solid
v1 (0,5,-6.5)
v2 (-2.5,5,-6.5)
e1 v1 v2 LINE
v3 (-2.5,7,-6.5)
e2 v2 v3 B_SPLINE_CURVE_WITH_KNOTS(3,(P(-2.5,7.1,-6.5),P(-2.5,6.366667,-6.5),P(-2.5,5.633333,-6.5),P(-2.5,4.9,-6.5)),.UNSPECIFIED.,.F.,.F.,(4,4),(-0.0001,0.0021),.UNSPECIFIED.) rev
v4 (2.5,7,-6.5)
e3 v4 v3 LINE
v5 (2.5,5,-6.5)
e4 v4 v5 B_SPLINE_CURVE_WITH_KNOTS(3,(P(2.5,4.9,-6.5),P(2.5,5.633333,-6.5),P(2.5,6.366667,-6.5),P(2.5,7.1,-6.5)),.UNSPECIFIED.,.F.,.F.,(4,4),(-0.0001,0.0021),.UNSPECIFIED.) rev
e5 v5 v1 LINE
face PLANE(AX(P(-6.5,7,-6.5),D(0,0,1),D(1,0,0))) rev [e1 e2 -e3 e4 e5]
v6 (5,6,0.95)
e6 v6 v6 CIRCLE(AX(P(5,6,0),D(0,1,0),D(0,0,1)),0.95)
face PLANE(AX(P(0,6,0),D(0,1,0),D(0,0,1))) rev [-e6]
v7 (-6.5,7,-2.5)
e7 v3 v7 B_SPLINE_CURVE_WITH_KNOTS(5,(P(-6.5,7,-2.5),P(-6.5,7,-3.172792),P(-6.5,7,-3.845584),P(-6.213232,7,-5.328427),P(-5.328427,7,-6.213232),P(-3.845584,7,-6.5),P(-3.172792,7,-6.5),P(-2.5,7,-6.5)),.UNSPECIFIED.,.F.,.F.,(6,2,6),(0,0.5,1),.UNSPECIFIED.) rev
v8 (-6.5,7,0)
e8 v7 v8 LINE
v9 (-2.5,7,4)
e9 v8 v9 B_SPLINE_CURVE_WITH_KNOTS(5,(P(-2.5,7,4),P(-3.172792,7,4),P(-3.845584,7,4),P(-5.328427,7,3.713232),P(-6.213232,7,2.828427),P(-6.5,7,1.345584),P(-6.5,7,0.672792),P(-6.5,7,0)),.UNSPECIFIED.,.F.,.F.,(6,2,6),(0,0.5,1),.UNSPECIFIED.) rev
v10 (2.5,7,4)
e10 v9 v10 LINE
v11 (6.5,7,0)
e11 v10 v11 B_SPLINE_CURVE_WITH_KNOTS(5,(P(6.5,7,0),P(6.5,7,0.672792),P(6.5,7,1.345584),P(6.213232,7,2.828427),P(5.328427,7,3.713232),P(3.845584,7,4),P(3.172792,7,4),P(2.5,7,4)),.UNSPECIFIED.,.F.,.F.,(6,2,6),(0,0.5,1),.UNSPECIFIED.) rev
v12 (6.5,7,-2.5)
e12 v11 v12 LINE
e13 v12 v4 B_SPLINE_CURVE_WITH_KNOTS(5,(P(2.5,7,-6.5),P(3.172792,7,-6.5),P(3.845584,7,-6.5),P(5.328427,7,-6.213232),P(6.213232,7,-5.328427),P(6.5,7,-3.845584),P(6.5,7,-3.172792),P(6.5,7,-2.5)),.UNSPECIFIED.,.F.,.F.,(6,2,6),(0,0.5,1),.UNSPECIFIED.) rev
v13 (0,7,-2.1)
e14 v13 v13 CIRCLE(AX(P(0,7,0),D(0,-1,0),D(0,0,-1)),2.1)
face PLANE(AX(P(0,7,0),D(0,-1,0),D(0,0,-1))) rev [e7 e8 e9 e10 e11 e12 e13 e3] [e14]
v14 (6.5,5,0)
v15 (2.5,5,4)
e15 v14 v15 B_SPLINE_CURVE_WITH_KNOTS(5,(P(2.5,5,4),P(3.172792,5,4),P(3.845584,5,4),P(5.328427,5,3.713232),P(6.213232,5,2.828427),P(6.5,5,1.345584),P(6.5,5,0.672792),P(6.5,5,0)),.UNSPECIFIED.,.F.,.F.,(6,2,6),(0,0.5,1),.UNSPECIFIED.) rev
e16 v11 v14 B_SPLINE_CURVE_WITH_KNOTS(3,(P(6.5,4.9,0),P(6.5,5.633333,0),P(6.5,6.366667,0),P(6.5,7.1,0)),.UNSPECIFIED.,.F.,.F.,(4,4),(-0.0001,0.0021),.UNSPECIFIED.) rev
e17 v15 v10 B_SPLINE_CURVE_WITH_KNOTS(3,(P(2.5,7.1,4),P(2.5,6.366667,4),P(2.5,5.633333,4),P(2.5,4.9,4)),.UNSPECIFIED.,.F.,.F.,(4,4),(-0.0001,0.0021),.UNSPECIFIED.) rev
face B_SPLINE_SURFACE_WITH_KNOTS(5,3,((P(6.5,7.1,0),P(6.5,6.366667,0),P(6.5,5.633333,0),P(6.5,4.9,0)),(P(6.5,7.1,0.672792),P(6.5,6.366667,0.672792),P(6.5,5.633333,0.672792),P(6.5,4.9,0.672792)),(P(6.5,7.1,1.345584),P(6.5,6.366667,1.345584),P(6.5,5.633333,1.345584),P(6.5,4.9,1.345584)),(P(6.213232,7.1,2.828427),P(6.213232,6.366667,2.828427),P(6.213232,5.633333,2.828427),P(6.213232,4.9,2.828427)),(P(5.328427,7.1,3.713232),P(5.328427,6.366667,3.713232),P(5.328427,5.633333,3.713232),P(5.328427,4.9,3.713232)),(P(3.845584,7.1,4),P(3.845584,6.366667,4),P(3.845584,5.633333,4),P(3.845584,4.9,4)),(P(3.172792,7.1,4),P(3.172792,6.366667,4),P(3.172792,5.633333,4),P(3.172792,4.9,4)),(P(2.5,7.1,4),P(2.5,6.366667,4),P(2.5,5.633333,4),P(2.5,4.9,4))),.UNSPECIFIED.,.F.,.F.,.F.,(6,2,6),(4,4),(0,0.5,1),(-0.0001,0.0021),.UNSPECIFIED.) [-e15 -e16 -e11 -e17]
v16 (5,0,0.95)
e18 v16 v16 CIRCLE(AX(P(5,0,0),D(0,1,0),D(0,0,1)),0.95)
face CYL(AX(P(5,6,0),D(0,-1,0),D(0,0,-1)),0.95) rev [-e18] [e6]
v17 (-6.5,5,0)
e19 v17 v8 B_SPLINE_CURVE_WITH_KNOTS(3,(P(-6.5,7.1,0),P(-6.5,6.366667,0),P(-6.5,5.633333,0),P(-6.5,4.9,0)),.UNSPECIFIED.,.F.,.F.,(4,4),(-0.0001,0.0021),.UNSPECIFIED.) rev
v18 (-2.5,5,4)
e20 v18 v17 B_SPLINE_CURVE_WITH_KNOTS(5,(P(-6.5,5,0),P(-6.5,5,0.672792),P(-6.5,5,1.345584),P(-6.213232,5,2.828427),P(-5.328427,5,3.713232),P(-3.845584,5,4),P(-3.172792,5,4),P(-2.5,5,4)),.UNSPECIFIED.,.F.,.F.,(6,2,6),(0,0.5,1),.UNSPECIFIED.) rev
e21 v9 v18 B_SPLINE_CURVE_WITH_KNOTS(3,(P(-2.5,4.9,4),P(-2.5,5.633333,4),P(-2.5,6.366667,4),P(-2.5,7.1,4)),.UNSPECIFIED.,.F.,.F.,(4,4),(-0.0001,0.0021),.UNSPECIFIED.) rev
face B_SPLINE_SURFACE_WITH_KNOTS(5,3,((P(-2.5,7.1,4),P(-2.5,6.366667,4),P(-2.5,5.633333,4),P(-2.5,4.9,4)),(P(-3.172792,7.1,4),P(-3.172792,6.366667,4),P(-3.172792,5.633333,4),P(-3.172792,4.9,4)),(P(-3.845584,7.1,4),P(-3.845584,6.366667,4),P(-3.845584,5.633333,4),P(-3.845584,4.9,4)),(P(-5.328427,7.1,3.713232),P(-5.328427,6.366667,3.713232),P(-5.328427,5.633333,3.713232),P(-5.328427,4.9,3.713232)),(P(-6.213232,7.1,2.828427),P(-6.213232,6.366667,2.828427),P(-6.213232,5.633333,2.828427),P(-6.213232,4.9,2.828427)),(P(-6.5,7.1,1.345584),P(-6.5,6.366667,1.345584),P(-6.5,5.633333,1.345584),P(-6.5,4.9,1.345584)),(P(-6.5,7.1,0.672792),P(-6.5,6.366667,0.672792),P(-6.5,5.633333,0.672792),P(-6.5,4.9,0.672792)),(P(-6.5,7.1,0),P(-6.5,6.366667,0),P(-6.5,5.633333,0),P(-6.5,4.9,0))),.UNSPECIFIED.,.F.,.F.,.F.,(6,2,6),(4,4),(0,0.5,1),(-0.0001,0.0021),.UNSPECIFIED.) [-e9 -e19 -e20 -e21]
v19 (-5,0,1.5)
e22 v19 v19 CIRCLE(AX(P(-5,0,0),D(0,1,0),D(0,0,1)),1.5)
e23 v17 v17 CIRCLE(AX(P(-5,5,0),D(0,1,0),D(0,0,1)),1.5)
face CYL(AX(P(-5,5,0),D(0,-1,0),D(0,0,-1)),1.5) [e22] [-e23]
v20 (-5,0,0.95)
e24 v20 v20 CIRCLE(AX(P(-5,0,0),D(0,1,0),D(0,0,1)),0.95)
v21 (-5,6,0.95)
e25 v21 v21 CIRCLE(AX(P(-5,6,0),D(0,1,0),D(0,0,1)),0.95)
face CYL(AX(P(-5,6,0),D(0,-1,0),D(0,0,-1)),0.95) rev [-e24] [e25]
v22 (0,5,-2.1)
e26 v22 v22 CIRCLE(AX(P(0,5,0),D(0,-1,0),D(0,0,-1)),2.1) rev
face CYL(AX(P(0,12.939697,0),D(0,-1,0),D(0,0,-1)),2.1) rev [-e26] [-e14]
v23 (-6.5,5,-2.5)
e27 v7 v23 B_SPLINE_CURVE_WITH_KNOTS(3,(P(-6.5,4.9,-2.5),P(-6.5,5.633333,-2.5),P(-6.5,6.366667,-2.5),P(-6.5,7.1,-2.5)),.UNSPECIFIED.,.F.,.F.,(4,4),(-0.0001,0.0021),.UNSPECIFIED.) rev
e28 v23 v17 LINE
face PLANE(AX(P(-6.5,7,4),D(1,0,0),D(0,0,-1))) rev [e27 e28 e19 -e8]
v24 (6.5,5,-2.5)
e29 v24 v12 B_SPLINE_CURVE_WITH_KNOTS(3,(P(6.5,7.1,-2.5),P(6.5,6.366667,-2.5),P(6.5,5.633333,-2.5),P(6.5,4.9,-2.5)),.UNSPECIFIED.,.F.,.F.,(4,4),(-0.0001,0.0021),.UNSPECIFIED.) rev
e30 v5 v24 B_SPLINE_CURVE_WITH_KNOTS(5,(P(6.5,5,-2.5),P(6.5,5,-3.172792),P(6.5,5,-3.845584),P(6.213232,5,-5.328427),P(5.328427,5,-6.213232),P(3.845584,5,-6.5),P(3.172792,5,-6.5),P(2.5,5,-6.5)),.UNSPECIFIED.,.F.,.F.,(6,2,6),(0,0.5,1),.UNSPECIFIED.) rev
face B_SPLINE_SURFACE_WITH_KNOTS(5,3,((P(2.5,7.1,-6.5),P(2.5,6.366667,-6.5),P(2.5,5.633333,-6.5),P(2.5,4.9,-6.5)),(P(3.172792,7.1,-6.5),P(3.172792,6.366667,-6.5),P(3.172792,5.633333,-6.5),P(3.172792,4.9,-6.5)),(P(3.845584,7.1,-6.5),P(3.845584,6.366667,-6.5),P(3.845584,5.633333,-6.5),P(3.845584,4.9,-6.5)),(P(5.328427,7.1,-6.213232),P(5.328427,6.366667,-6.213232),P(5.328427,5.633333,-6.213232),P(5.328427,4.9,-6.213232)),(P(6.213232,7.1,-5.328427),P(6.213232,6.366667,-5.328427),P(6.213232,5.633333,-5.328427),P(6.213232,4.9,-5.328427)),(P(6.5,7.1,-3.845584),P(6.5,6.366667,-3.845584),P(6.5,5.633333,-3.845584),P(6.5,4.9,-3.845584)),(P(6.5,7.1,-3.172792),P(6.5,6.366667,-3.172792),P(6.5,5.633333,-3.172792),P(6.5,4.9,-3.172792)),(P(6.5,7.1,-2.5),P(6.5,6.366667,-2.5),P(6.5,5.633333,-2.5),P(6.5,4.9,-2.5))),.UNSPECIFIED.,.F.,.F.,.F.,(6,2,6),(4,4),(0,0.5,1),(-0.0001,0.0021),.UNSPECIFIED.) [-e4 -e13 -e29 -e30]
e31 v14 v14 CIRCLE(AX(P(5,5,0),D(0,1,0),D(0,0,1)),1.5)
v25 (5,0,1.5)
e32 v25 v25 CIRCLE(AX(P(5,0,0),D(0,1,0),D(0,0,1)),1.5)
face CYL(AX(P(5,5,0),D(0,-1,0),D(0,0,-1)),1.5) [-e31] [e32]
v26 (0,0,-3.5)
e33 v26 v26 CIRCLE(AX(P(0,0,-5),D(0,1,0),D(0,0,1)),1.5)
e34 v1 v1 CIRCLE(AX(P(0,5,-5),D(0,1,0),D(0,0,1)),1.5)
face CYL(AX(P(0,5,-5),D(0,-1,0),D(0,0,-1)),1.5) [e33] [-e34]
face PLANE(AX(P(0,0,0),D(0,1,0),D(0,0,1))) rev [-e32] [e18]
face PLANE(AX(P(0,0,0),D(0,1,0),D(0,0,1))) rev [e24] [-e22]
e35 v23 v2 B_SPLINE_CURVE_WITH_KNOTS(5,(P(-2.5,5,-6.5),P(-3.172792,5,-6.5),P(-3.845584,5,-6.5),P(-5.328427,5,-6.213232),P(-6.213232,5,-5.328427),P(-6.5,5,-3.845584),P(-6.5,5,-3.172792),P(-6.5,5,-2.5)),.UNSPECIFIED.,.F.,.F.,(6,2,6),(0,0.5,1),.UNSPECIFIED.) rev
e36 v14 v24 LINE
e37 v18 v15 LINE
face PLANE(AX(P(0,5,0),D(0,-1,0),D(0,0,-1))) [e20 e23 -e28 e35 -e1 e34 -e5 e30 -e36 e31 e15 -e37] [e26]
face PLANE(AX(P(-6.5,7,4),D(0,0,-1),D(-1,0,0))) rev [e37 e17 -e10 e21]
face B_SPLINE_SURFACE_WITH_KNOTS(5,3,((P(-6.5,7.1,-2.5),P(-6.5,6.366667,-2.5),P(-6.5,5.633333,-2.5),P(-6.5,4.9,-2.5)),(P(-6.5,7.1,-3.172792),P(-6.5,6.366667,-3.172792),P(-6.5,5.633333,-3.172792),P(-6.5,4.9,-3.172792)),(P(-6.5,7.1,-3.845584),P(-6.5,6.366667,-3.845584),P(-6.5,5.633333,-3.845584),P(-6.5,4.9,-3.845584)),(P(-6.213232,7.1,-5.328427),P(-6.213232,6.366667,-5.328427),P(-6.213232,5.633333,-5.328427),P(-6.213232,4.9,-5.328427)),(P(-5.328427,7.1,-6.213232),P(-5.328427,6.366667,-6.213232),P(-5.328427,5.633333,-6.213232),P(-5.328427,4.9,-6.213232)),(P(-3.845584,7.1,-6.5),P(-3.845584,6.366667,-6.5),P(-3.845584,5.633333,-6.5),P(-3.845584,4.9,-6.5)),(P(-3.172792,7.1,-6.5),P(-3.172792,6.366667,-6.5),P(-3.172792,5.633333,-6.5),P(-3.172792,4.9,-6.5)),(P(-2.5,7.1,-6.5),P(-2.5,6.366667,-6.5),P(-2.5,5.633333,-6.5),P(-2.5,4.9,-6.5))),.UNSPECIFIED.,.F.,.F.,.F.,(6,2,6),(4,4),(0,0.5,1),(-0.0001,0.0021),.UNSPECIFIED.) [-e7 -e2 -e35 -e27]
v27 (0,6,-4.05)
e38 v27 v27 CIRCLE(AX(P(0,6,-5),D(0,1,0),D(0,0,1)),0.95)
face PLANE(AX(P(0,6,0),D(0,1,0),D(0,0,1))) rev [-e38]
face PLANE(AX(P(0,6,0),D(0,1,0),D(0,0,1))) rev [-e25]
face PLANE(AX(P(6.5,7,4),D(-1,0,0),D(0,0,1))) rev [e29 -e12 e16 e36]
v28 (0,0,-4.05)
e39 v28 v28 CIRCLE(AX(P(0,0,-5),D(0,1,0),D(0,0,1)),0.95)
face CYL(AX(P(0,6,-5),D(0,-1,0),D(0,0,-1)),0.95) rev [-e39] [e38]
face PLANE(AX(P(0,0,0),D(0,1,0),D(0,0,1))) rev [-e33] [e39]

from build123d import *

# Parameters (mm, degrees)
SKETCH_1_R          = 1.5
EXTRUDE_1_DEPTH     = 5
EXTRUDE_1_2_DEPTH   = 5
EXTRUDE_1_3_DEPTH   = 5
SKETCH_2_W          = 13
SKETCH_2_H          = 10.5
EXTRUDE_6_DEPTH     = 2
SKETCH_1_6_R        = 2.1
CUT_EXTRUDE_2_DEPTH = 7
FILLET_1_SIZE       = 4
SKETCH_1_7_R        = 0.95
CUT_EXTRUDE_3_DEPTH = 6


with BuildPart() as part:
    # 草图1 → 凸台-拉伸1 (new body)
    with BuildSketch(Plane(origin=(0, 0, 0), x_dir=(1, 0, 0), z_dir=(0, 1, 0))):
        with Locations(Location((-5, 0, 0), (0, 0, 270))):
            Circle(SKETCH_1_R)
    extrude(amount=EXTRUDE_1_DEPTH)



with BuildPart() as body_2:
    # 草图1 → Extrude 1 2 (new body)
    with BuildSketch(Plane(origin=(0, 0, 0), x_dir=(1, 0, 0), z_dir=(0, 1, 0))):
        with Locations(Location((0, 5, 0), (0, 0, 270))):
            Circle(SKETCH_1_R)
    extrude(amount=EXTRUDE_1_2_DEPTH)


with BuildPart() as body_3:
    # 草图1 → Extrude 1 3 (new body)
    with BuildSketch(Plane(origin=(0, 0, 0), x_dir=(1, 0, 0), z_dir=(0, 1, 0))):
        with Locations(Location((5, 0, 0), (0, 0, 270))):
            Circle(SKETCH_1_R)
    extrude(amount=EXTRUDE_1_3_DEPTH)


with BuildPart() as part_1:
    add(part.part)

    add(body_2.part)  # 凸台-拉伸6 merges body 2

    add(body_3.part)  # 凸台-拉伸6 merges body 3
    # 草图2 → 凸台-拉伸6 (add)
    with BuildSketch(Plane(origin=(0, 5, 0), x_dir=(1, 0, 0), z_dir=(0, 1, 0))):
        with Locations((0, 1.25)):
            Rectangle(SKETCH_2_W, SKETCH_2_H)
    extrude(amount=EXTRUDE_6_DEPTH)

    # 草图1<6> → 切除-拉伸2 (cut)
    with BuildSketch(Plane(origin=(0, 0, 0), x_dir=(1, 0, 0), z_dir=(0, 1, 0))):
        with Locations(Location((0, 0, 0), (0, 0, 90))):
            Circle(SKETCH_1_6_R)
    extrude(amount=CUT_EXTRUDE_2_DEPTH, mode=Mode.SUBTRACT)

    # 圆角1
    # a fillet whose section is not a circle: 4 mm, written as the material it takes off along each edge
    with BuildSketch(Plane(origin=(6.5, -5, -6.5), x_dir=(-1, 0, 0), z_dir=(0, 1, 0)), Plane(origin=(6.5, -5, 4), x_dir=(0, 0, -1), z_dir=(0, 1, 0)), Plane(origin=(-6.5, -5, 4), x_dir=(1, 0, 0), z_dir=(0, 1, 0))) as fillet_1_piece_1:
        with BuildLine():
            add(Edge.make_bspline([(FILLET_1_SIZE, 0), (FILLET_1_SIZE * 0.831801948466, 0), (FILLET_1_SIZE * 0.663603896932, 0), (FILLET_1_SIZE * 0.292893218813, FILLET_1_SIZE * 0.0716919198361), (FILLET_1_SIZE * 0.0716919198361, FILLET_1_SIZE * 0.292893218813), (0, FILLET_1_SIZE * 0.663603896932), (0, FILLET_1_SIZE * 0.831801948466), (0, FILLET_1_SIZE)], knots=[0, 0, 0, 0, 0, 0, 0.5, 0.5, 1, 1, 1, 1, 1, 1], degree=5))
            Line((0, FILLET_1_SIZE), (0, 0))
            Line((0, 0), (FILLET_1_SIZE, 0))
        make_face()
    extrude(amount=22, mode=Mode.SUBTRACT)
    with BuildSketch(Plane(origin=(-6.5, -5, -6.5), x_dir=(1, 0, 0), z_dir=(0, 1, 0))) as fillet_1_piece_2:
        with BuildLine():
            add(Edge.make_bspline([(FILLET_1_SIZE, 0), (FILLET_1_SIZE * 0.831801948466, 0), (FILLET_1_SIZE * 0.663603896932, 0), (FILLET_1_SIZE * 0.292893218813, -FILLET_1_SIZE * 0.0716919198361), (FILLET_1_SIZE * 0.0716919198361, -FILLET_1_SIZE * 0.292893218813), (0, -FILLET_1_SIZE * 0.663603896932), (0, -FILLET_1_SIZE * 0.831801948466), (0, -FILLET_1_SIZE)], knots=[0, 0, 0, 0, 0, 0, 0.5, 0.5, 1, 1, 1, 1, 1, 1], degree=5))
            Line((0, -FILLET_1_SIZE), (0, 0))
            Line((0, 0), (FILLET_1_SIZE, 0))
        make_face()
    extrude(amount=22, mode=Mode.SUBTRACT)

    # 草图1<7> → 切除-拉伸3 (cut)
    with BuildSketch(Plane(origin=(0, 0, 0), x_dir=(1, 0, 0), z_dir=(0, 1, 0))):
        with Locations(Location((5, 0, 0), (0, 0, 270))):
            Circle(SKETCH_1_7_R)
        with Locations(Location((0, 5, 0), (0, 0, 270))):
            Circle(SKETCH_1_7_R)
        with Locations(Location((-5, 0, 0), (0, 0, 270))):
            Circle(SKETCH_1_7_R)
    extrude(amount=CUT_EXTRUDE_3_DEPTH, mode=Mode.SUBTRACT)


solid = part_1.part
